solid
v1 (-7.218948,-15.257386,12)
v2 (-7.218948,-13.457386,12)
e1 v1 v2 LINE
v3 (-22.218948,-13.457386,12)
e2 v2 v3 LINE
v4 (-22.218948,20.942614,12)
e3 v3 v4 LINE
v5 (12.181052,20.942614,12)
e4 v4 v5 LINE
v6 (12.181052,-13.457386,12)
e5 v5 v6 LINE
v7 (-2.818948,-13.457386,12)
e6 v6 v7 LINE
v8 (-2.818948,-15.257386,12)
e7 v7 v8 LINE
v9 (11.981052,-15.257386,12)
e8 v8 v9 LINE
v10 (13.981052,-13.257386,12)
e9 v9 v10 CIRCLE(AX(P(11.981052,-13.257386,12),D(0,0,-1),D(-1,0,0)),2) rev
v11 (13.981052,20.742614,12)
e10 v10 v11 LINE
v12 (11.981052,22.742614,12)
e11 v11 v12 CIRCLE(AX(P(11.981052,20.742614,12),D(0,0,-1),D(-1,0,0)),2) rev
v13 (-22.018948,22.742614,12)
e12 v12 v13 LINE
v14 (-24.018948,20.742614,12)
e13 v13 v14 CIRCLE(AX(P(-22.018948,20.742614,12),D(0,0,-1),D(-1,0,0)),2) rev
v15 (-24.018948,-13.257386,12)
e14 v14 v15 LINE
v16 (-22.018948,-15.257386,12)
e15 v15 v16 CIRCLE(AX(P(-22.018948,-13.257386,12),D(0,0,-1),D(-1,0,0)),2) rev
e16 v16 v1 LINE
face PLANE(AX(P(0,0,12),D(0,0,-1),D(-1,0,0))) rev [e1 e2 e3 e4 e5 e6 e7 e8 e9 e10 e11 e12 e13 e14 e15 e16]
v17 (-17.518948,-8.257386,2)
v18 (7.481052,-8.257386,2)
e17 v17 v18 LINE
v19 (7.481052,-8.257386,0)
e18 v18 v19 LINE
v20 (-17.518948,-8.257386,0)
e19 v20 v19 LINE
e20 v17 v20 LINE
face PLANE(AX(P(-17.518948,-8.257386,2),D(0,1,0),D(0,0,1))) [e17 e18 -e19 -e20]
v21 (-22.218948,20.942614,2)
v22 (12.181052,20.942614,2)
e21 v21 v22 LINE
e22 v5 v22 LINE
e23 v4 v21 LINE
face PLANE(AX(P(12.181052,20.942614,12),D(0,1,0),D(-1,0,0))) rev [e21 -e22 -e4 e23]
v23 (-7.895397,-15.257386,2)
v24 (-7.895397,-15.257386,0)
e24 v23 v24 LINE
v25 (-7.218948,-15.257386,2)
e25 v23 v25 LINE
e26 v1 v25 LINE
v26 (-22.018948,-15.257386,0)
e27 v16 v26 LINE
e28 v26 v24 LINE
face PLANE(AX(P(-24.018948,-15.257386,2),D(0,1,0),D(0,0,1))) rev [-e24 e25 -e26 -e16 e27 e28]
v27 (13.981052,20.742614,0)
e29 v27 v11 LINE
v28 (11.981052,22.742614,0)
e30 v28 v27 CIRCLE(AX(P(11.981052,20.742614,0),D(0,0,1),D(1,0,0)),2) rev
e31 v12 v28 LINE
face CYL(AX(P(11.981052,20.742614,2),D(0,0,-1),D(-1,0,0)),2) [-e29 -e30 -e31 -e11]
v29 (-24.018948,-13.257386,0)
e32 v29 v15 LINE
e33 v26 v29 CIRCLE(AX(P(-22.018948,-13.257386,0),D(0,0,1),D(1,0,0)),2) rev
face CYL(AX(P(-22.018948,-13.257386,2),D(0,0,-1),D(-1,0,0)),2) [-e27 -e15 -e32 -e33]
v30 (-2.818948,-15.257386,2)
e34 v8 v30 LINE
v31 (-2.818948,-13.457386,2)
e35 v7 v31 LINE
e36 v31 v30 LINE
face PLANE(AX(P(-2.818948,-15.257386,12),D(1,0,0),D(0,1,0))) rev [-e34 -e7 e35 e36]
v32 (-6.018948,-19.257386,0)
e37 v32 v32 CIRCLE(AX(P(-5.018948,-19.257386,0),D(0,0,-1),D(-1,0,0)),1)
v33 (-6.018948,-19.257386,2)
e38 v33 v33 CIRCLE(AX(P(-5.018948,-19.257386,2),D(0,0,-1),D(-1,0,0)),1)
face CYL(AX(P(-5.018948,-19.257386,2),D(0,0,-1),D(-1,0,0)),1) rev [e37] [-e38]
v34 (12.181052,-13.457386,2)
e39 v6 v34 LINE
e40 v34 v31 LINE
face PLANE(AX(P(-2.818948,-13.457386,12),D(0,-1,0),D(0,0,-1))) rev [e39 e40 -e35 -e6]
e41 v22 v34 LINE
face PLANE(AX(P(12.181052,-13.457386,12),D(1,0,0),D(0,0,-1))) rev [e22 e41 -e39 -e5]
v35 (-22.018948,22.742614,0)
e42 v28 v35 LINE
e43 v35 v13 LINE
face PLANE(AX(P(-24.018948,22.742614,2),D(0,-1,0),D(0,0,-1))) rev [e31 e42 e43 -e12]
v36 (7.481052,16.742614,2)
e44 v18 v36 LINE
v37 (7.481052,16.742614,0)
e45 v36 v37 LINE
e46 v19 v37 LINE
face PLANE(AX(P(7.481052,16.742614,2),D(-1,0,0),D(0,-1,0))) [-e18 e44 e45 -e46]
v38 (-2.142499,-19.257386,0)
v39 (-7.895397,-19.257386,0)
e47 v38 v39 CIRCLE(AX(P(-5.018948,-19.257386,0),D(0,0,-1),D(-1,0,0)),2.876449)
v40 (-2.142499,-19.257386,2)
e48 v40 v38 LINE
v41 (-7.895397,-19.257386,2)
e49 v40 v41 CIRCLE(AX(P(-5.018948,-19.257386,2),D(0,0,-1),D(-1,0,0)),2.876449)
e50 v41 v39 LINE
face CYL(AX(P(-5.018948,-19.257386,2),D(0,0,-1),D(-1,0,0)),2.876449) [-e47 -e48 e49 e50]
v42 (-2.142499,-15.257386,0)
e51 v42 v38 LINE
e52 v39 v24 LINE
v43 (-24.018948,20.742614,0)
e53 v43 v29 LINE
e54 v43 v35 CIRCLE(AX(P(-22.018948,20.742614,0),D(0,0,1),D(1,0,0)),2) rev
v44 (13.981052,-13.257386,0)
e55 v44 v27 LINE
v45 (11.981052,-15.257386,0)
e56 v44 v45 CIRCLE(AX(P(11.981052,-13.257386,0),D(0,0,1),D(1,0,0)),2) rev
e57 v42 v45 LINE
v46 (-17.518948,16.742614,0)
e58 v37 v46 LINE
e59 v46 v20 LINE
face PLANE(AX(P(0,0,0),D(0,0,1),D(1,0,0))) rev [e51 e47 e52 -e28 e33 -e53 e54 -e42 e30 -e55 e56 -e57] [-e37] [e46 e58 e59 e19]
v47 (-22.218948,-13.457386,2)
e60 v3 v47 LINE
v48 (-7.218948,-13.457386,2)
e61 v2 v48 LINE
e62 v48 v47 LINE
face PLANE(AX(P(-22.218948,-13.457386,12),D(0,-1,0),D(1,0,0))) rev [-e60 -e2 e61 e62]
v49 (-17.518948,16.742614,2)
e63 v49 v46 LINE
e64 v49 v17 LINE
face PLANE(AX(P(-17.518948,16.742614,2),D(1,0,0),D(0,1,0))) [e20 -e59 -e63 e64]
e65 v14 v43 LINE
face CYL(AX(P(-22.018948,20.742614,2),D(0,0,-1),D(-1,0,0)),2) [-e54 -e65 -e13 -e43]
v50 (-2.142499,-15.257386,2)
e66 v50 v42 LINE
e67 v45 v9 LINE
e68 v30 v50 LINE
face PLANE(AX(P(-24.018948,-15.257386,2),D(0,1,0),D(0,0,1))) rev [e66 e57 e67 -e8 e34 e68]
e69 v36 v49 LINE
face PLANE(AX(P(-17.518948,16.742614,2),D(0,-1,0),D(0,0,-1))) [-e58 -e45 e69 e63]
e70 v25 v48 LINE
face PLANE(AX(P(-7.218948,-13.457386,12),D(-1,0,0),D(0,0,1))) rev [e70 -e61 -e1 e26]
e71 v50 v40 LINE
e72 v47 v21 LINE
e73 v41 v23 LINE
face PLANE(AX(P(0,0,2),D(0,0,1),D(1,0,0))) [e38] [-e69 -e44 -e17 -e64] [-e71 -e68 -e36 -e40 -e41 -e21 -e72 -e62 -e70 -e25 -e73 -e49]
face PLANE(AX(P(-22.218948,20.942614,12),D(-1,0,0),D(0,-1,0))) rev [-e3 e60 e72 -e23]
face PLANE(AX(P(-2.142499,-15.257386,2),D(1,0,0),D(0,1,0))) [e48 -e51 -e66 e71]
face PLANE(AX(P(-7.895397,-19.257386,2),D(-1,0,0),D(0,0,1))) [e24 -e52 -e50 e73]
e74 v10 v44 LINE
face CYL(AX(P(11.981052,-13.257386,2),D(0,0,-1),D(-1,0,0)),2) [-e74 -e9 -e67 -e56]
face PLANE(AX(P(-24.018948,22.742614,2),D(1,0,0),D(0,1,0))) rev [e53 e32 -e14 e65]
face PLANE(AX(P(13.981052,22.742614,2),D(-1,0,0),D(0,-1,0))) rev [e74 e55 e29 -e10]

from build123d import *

# Parameters (mm, degrees)
ESQUISSE1_W        = 38
ESQUISSE1_H        = 38
ESQUISSE1_W_2      = 25
ESQUISSE1_H_2      = 25
BOSS_EXTRU_1_DEPTH = 2
BOSS_EXTRU_2_DEPTH = 10
CONG_1_R           = 2
ESQUISSE3_R        = 1
BOSS_EXTRU_3_DEPTH = 2


# Read off the part's stored shape, not the designer's step: Boss.-Extru.2
with BuildPart() as part:
    # Esquisse1 → Boss.-Extru.1 (new body)
    with BuildSketch(Plane.XY):
        with Locations((-5.018947996, 3.742614476)):
            Rectangle(ESQUISSE1_W, ESQUISSE1_H)
        with Locations((-5.018947996, 4.242614476)):
            Rectangle(ESQUISSE1_W_2, ESQUISSE1_H_2, mode=Mode.SUBTRACT)
    extrude(amount=BOSS_EXTRU_1_DEPTH)

    # Boss.-Extru.2 outline → Boss.-Extru.2 (add)
    with BuildSketch(Plane.XY.offset(2)):
        Polygon((-24.018947996, 22.742614476), (-24.018947996, -15.257385524), (-7.218947996, -15.257385524), (-7.218947996, -13.457385524), (-22.218947996, -13.457385524), (-22.218947996, 20.942614476), (12.181052004, 20.942614476), (12.181052004, -13.457385524), (-2.818947996, -13.457385524), (-2.818947996, -15.257385524), (13.981052004, -15.257385524), (13.981052004, 22.742614476), align=None)
    extrude(amount=BOSS_EXTRU_2_DEPTH)

    # Congé1
    cong_1_edges = [part.edges().sort_by_distance(p)[0] for p in [
        (-24.018947996, 22.742614476, 6),
        (13.981052004, 22.742614476, 7),
        (13.981052004, -15.257385524, 7),
        (-24.018947996, -15.257385524, 7),
    ]]
    fillet(cong_1_edges, radius=CONG_1_R)

    # Esquisse3 → Boss.-Extru.3 (add)
    with BuildSketch(Plane(origin=(0, 0, 0), x_dir=(-1, 0, 0), z_dir=(0, 0, -1))):
        with BuildLine():
            Line((2.142498892, -15.257385524), (2.142498892, -19.257385524))
            ThreePointArc((2.142498892, -19.257385524), (5.018947996, -22.133834629), (7.895397101, -19.257385524))
            Line((7.895397101, -19.257385524), (7.895397101, -15.257385524))
            Line((7.895397101, -15.257385524), (2.142498892, -15.257385524))
        make_face()
        with Locations((5.018947996, -19.257385524)):
            Circle(ESQUISSE3_R, mode=Mode.SUBTRACT)
    extrude(amount=-BOSS_EXTRU_3_DEPTH)


solid = part.part
